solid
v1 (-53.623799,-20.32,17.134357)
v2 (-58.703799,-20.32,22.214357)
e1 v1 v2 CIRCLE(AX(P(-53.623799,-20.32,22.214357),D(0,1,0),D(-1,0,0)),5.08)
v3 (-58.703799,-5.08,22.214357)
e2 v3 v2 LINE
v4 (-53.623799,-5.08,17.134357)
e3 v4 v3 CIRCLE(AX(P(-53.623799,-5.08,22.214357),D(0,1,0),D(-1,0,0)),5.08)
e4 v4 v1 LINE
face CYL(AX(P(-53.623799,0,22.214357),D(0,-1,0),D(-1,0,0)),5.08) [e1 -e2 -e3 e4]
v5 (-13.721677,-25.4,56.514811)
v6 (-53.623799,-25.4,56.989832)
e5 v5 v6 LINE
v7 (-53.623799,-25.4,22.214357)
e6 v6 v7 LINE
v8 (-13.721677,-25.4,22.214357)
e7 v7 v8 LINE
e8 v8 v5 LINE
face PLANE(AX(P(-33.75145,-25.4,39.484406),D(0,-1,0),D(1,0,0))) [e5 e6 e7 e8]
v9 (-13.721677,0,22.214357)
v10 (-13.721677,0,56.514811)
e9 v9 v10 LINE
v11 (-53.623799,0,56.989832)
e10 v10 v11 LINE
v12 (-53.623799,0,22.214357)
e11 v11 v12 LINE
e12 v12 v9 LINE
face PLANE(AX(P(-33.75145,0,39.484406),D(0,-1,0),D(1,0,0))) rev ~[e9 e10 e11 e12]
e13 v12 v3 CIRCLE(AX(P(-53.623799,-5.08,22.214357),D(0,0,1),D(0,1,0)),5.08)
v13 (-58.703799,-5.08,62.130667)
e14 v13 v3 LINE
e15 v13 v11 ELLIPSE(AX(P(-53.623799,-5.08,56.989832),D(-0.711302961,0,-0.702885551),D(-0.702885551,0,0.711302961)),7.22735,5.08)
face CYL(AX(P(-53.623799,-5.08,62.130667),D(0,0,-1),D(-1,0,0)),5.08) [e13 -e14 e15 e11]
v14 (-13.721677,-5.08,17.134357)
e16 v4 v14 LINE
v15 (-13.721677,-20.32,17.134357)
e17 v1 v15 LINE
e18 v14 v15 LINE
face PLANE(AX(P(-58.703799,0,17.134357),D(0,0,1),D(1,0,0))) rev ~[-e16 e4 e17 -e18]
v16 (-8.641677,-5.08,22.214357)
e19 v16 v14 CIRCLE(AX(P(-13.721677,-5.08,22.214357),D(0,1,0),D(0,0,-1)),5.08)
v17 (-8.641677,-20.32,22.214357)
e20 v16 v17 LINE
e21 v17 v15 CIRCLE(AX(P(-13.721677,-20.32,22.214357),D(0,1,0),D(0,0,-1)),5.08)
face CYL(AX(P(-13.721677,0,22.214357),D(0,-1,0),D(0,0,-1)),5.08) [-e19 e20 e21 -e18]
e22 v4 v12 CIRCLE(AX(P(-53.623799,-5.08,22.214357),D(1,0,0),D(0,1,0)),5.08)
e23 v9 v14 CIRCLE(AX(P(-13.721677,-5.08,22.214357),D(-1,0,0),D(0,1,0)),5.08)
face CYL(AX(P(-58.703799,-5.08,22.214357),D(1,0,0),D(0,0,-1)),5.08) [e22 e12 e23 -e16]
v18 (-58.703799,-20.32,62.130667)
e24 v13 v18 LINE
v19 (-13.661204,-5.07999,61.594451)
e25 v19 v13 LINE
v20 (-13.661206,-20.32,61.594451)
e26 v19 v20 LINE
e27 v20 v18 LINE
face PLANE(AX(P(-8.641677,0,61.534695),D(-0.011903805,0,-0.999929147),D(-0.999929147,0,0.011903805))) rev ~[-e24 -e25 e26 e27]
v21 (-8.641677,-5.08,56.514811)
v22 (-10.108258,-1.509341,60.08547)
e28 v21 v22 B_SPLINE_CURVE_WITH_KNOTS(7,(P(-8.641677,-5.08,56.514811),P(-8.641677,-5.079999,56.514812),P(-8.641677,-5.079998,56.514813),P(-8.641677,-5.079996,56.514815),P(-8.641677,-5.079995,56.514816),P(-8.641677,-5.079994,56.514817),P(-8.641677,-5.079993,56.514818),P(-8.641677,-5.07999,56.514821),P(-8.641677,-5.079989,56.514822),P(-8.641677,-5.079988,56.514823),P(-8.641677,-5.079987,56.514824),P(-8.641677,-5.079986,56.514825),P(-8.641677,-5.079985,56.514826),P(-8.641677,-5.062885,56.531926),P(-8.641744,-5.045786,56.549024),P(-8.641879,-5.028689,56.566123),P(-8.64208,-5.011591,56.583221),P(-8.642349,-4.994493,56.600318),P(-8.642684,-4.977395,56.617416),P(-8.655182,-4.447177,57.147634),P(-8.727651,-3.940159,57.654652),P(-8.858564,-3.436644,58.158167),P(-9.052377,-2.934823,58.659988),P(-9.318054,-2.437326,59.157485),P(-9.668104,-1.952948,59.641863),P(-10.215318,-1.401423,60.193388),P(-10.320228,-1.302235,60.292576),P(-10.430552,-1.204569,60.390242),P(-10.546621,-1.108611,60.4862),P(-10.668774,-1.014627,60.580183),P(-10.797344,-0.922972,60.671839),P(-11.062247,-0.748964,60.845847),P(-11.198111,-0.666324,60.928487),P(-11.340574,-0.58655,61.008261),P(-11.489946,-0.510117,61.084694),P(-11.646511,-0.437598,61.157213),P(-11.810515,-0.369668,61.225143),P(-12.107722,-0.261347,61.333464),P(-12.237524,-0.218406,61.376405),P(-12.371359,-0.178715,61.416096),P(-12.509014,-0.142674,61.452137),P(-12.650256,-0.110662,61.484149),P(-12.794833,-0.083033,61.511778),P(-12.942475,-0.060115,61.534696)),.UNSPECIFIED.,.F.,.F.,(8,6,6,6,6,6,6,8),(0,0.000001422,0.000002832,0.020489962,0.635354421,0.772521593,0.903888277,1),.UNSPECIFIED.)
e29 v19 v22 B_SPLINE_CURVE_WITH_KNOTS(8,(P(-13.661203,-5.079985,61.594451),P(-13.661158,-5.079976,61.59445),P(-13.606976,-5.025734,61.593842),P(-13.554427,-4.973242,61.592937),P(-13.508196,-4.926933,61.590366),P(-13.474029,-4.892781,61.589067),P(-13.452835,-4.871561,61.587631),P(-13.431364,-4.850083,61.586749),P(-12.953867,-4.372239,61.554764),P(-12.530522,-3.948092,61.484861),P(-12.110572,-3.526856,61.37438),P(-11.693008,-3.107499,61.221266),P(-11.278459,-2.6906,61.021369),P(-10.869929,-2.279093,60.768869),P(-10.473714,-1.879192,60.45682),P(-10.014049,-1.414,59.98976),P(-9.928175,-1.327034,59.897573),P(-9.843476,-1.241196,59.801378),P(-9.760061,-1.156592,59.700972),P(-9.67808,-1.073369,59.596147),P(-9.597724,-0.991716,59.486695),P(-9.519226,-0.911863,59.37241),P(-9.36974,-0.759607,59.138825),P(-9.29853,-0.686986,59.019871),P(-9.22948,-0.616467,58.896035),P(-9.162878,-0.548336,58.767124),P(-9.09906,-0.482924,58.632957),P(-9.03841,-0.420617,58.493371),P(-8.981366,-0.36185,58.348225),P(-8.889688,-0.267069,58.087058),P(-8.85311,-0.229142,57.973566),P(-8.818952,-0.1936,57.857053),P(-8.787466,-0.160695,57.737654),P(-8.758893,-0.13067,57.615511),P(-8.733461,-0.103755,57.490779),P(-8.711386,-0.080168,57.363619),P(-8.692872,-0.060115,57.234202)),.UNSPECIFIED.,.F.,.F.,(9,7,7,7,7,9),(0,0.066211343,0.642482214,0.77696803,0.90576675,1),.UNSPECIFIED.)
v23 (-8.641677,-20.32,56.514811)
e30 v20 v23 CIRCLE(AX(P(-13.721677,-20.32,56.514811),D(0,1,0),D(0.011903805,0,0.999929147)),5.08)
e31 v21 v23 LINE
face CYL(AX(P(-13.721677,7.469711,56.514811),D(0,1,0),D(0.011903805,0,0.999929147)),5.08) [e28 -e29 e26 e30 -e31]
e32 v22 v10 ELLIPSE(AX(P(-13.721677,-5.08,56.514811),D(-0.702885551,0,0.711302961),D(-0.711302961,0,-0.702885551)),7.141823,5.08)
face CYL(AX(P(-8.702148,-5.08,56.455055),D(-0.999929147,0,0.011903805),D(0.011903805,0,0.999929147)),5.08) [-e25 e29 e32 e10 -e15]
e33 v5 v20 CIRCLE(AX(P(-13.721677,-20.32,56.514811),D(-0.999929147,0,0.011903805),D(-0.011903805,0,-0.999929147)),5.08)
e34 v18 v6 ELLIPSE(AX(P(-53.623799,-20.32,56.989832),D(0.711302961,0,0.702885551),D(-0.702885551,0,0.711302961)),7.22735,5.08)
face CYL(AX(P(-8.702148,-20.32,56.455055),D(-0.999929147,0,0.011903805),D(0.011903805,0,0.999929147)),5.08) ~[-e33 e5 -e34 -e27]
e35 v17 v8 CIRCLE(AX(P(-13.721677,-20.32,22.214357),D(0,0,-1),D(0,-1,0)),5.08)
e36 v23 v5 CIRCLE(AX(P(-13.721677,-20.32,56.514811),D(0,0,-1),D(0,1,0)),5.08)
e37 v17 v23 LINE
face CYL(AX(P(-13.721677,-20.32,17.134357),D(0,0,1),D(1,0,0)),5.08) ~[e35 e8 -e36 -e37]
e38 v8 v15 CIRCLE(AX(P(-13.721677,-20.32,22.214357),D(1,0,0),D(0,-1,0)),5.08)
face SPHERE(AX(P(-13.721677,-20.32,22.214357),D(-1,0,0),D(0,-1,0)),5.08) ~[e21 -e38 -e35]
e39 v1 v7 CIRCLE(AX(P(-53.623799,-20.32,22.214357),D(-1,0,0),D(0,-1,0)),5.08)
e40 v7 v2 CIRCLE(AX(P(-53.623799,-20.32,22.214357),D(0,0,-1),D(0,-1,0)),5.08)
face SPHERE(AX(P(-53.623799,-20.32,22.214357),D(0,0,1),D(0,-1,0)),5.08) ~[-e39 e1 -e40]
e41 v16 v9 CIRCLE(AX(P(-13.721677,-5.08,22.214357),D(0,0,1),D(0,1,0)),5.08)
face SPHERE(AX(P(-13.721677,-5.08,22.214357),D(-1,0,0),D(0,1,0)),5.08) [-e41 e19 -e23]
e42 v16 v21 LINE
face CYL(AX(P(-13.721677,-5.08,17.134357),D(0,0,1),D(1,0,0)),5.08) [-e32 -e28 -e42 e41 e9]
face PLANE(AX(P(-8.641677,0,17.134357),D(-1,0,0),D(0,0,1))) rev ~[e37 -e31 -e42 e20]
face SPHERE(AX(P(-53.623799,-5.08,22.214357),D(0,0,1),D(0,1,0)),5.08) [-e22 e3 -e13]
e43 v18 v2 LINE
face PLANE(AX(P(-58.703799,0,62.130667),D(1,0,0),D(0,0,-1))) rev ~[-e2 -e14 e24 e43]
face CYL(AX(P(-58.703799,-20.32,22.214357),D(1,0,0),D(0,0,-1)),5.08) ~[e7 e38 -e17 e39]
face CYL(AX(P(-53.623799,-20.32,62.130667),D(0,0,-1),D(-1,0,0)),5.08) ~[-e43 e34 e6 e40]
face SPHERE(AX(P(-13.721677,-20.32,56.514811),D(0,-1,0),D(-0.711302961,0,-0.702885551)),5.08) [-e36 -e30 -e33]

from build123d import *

# Parameters (mm, degrees)
F1_DEPTH    = 25.4
F2_R        = 5.08
F3_T1_DEPTH = 27.7897108637
F3_T6_DEPTH = 5.1816


# Not quite as in the source:
# - a fillet or chamfer that OpenCascade refuses, or shapes differently, is made with other operations: its cross-section is extruded or revolved along the edge and cut away or added


with BuildPart() as f1:
    # F0 (on Front) → F1 (new body)
    with BuildSketch(Plane.XZ):
        Polygon((-8.6416769773, 61.5346953273), (-58.7037988007, 62.1306672692), (-58.7037988007, 17.1343572438), (-8.6416769773, 17.1343572438), align=None)
    extrude(amount=F1_DEPTH)

    # F2
    f2_edges = [f1.edges().sort_by_distance(p)[0] for p in [
        (-33.672738, -25.4, 61.832681),
        (-58.703799, -25.4, 39.632512),
        (-33.672738, -25.4, 17.134357),
        (-8.641677, -25.4, 39.334526),
        (-33.672738, 0, 61.832681),
        (-58.703799, 0, 39.632512),
        (-33.672738, 0, 17.134357),
        (-8.641677, 0, 39.334526),
        (-58.703799, -12.7, 17.134357),
        (-8.641677, -12.7, 17.134357),
    ]]
    fillet(f2_edges, radius=F2_R)

    # F3: fillet of radius 5.08 on 5 edges, made by hand

    # F3_s2 → F3_t1 (cut)
    with BuildSketch(Plane.XZ.offset(-7.4697108637)):
        with BuildLine():
            ThreePointArc((-13.6612056499, 61.5944510496), (-10.1082579355, 60.0854695805), (-8.6416769773, 56.5148109818))
            Line((-8.6416769773, 56.5148109818), (-8.6416769773, 61.5346953273))
            Line((-8.6416769773, 61.5346953273), (-13.6612056499, 61.5944510496))
        make_face()
    extrude(amount=F3_T1_DEPTH, mode=Mode.SUBTRACT)


with BuildPart() as f3_tool4:
    # F3_s5 → F3_t6 (new body)
    with BuildSketch(Plane.XZ.offset(20.32)):
        Polygon((-13.7216769773, 56.5148109818), (-13.6599962234, 61.696043851), (-8.5400769773, 61.6350930142), (-8.5400769773, 56.5148109818), align=None)
    extrude(amount=F3_T6_DEPTH)

    # F3_s7 → F3_t8 (revolve, cut)
    with BuildSketch(Plane(origin=(-13.7216769773, -20.32, 56.5148109818), x_dir=(-0.711302961, 0, -0.7028855509), z_dir=(-0.7028855509, 0, 0.711302961))):
        with BuildLine():
            ThreePointArc((0, -5.08), (5.08, 0), (0, 5.08))
            Line((0, 5.08), (0, -5.08))
        make_face()
    revolve(axis=Axis((-13.7216769773, -20.32, 56.5148109818), (0, -1, 0)), mode=Mode.SUBTRACT)


with BuildPart() as f1_1:
    add(f1.part)

    # F3_t3: cut F3_tool4
    add(f3_tool4.part, mode=Mode.SUBTRACT)


solid = f1_1.part
